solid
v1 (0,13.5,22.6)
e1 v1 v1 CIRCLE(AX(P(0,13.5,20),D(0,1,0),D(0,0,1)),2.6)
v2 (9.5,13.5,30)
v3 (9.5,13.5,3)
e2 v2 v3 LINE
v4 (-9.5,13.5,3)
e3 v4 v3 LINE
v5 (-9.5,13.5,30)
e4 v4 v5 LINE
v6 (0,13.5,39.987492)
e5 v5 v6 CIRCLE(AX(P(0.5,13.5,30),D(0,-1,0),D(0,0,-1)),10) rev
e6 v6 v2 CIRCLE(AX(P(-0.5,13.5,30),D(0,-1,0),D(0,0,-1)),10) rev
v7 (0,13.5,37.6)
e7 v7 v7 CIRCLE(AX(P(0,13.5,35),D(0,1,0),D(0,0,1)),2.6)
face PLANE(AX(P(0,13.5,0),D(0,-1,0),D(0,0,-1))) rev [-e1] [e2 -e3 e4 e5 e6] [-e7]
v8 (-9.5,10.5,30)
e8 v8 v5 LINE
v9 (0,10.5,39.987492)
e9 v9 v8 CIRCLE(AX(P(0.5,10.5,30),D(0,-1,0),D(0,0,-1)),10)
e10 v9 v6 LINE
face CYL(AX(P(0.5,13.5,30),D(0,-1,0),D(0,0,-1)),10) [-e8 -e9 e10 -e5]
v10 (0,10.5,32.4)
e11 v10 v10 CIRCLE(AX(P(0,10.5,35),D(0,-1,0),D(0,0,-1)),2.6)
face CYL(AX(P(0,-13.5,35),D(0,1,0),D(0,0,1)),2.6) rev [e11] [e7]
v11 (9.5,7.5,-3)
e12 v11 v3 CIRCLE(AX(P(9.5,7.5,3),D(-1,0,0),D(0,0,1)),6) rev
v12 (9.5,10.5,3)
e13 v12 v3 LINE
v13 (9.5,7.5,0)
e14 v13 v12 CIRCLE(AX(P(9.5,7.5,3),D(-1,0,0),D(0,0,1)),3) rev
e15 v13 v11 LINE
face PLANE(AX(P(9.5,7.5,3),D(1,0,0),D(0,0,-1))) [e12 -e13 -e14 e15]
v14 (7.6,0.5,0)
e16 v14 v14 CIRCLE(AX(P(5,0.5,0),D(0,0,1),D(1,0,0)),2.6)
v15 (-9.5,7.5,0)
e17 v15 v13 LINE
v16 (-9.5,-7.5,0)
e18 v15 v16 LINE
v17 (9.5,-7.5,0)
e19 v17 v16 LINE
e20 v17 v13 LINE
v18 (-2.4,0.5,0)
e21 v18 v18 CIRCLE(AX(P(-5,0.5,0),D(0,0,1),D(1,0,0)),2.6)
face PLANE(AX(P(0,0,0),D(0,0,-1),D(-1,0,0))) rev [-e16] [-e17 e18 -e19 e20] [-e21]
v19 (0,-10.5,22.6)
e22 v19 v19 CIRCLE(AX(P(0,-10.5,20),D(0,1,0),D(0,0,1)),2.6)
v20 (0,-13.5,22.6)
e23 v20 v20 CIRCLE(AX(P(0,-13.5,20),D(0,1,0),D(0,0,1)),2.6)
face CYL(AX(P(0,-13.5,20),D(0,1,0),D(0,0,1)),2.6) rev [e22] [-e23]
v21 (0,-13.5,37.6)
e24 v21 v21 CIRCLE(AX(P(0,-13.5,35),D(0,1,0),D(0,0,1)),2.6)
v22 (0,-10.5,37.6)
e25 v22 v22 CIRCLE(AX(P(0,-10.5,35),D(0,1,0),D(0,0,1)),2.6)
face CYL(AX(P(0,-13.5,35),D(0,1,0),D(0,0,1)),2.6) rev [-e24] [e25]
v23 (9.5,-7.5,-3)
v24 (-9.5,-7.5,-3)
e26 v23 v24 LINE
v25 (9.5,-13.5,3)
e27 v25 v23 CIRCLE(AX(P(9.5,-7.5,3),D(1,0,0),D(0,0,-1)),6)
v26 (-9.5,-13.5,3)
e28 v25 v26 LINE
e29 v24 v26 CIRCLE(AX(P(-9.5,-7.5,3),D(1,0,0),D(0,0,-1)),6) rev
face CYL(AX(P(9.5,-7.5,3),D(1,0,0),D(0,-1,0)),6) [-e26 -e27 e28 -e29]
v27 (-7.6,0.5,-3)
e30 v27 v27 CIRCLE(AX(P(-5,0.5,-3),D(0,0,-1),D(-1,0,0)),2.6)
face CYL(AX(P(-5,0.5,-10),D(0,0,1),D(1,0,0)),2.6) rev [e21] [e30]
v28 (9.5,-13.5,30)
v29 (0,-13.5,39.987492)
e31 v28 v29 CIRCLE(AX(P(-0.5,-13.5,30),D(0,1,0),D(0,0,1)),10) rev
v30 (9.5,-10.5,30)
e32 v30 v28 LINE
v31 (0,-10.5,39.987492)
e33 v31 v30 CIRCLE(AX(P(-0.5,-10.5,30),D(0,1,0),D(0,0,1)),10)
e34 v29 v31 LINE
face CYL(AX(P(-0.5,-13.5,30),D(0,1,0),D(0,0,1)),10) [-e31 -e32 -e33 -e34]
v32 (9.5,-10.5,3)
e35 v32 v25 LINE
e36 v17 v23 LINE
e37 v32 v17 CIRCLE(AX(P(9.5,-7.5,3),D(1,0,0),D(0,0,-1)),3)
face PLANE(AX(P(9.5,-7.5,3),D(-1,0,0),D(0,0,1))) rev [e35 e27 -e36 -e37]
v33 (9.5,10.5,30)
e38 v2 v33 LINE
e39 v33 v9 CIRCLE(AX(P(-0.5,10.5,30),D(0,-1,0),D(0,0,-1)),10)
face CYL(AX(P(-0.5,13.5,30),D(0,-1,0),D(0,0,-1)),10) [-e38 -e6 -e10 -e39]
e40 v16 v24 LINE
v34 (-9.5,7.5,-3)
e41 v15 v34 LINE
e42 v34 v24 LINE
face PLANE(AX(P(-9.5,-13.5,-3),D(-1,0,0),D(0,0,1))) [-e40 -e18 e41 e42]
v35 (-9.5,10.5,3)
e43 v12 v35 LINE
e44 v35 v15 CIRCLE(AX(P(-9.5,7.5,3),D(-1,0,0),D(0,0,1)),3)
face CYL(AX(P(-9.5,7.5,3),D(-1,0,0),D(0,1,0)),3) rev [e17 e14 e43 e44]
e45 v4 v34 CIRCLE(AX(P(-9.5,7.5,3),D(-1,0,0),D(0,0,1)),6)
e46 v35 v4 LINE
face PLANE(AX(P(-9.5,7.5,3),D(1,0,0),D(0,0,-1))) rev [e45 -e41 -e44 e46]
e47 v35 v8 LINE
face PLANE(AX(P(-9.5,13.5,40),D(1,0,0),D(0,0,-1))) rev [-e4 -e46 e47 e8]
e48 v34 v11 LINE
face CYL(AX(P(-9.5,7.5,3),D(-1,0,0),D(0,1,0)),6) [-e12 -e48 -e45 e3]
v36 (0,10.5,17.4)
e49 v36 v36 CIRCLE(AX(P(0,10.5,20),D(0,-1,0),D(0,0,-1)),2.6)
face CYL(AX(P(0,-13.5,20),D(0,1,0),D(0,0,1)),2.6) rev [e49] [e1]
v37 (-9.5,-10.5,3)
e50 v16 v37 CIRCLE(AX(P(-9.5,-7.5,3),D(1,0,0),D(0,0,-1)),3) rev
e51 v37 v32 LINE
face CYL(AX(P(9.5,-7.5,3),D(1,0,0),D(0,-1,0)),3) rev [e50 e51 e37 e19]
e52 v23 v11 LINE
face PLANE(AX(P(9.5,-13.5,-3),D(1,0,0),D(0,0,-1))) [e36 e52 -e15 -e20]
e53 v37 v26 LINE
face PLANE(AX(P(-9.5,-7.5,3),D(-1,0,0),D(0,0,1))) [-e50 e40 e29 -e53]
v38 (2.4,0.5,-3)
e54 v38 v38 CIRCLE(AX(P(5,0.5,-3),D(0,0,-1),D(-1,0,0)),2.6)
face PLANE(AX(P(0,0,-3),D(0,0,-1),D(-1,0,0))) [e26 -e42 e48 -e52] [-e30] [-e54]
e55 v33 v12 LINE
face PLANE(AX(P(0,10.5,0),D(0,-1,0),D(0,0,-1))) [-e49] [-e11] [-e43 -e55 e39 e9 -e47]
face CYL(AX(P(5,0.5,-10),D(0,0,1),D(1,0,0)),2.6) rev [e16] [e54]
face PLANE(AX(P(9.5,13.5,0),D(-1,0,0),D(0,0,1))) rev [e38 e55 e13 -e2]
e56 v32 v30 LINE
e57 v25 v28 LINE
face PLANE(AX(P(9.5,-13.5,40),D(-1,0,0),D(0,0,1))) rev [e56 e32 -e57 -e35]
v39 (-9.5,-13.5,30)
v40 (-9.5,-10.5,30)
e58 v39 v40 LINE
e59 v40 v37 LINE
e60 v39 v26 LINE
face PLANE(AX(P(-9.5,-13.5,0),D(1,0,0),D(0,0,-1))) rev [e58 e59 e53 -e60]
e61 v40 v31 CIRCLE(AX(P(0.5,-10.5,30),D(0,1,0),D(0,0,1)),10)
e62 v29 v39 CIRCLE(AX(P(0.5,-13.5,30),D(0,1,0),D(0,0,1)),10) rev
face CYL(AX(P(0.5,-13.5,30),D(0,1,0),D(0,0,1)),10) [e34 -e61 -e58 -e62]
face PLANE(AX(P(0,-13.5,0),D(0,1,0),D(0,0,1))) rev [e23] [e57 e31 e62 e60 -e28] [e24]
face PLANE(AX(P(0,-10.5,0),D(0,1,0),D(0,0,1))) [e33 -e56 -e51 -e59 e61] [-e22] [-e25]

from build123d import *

# Parameters (mm, degrees)
SKETCH1_W                      = 19
SKETCH1_H                      = 27
BASE_FLANGE1_DEPTH             = 3
EDGE_FLANGE1_STRIP_W           = 18
EDGE_FLANGE1_STRIP_H           = 3
EDGE_FLANGE1_STRIP_CUT_DEPTH   = 19
EDGE_FLANGE1_STRIP_2_W         = 18
EDGE_FLANGE1_STRIP_2_H         = 3
EDGE_FLANGE1_STRIP_CUT_2_DEPTH = 19
EDGE_FLANGE1_DEPTH             = 19
EDGE_FLANGE1_BEND_DEPTH        = 19
SKETCH12_R                     = 2.6
CUT_EXTRUDE1_DEPTH             = 10
SKETCH13_R                     = 2.6
CUT_EXTRUDE2_DEPTH             = 50.185871955
FILLET1_R                      = 10


# Sheet-metal steps are written as plain solids
with BuildPart() as part:
    # Sketch1 → Base-Flange1 (new body)
    with BuildSketch(Plane.XY):
        Rectangle(SKETCH1_W, SKETCH1_H)
    extrude(amount=-BASE_FLANGE1_DEPTH)

    # Edge-Flange1 strip (across the edge) → Edge-Flange1 strip cut (cut)
    with BuildSketch(Plane(origin=(9.5, 13.5, 0), x_dir=(0, -1, 0), z_dir=(-1, 0, 0))):
        with Locations((-3, -1.5)):
            Rectangle(EDGE_FLANGE1_STRIP_W, EDGE_FLANGE1_STRIP_H)
    extrude(amount=EDGE_FLANGE1_STRIP_CUT_DEPTH, mode=Mode.SUBTRACT)

    # Edge-Flange1 strip 2 (across the edge) → Edge-Flange1 strip cut 2 (cut)
    with BuildSketch(Plane(origin=(-9.5, -13.5, 0), x_dir=(0, 1, 0), z_dir=(1, 0, 0))):
        with Locations((-3, -1.5)):
            Rectangle(EDGE_FLANGE1_STRIP_2_W, EDGE_FLANGE1_STRIP_2_H)
    extrude(amount=EDGE_FLANGE1_STRIP_CUT_2_DEPTH, mode=Mode.SUBTRACT)

    # Edge-Flange1 section (across the edge) → Edge-Flange1 (add)
    with BuildSketch(Plane(origin=(9.5, 13.5, 0), x_dir=(0, -1, 0), z_dir=(-1, 0, 0))):
        with BuildLine():
            Line((0, 3), (0, 40))
            Line((0, 40), (3, 40))
            Line((3, 40), (3, 3))
            ThreePointArc((3, 3), (3.878679656, 0.878679656), (6, 0))
            Line((6, 0), (6, -3))
            ThreePointArc((6, -3), (1.757359313, -1.242640687), (0, 3))
        make_face()
    extrude(amount=EDGE_FLANGE1_DEPTH)

    # Edge-Flange1 section 2 (across the edge) → Edge-Flange1 bend (add)
    with BuildSketch(Plane(origin=(-9.5, -13.5, 0), x_dir=(0, 1, 0), z_dir=(1, 0, 0))):
        with BuildLine():
            Line((0, 3), (0, 40))
            Line((0, 40), (3, 40))
            Line((3, 40), (3, 3))
            ThreePointArc((3, 3), (3.878679656, 0.878679656), (6, 0))
            Line((6, 0), (6, -3))
            ThreePointArc((6, -3), (1.757359313, -1.242640687), (0, 3))
        make_face()
    extrude(amount=EDGE_FLANGE1_BEND_DEPTH)

    # Sketch12 → Cut-Extrude1 (cut)
    with BuildSketch(Plane.XY):
        with Locations((5, 0.5)):
            Circle(SKETCH12_R)
        with Locations((-5, 0.5)):
            Circle(SKETCH12_R)
    extrude(amount=-CUT_EXTRUDE1_DEPTH, mode=Mode.SUBTRACT)

    # Sketch13 → Cut-Extrude2 (cut, through all)
    with BuildSketch(Plane(origin=(0, 13.5, 0), x_dir=(1, 0, 0), z_dir=(0, 1, 0))):
        with Locations(Location((0, -35, 0), (0, 0, 270))):
            Circle(SKETCH13_R)
        with Locations(Location((0, -20, 0), (0, 0, 270))):
            Circle(SKETCH13_R)
    extrude(amount=-CUT_EXTRUDE2_DEPTH, mode=Mode.SUBTRACT)

    # Fillet1
    # the kernel refuses this fillet: 10 mm, written as the material it takes off along each edge
    with BuildSketch(Plane(origin=(-9.5, -38.5, 40), x_dir=(0, 0, -1), z_dir=(0, 1, 0)), Plane(origin=(9.5, -38.5, 40), x_dir=(-1, 0, 0), z_dir=(0, 1, 0))) as fillet1_piece_1:
        with BuildLine():
            CenterArc((FILLET1_R, -FILLET1_R), FILLET1_R, 90, 90)
            Line((0, -FILLET1_R), (0, 0))
            Line((0, 0), (FILLET1_R, 0))
        make_face()
    extrude(amount=53, mode=Mode.SUBTRACT)
    with BuildSketch(Plane(origin=(-9.5, 38.5, 40), x_dir=(0, 0, -1), z_dir=(0, -1, 0)), Plane(origin=(9.5, 38.5, 40), x_dir=(-1, 0, 0), z_dir=(0, -1, 0))) as fillet1_piece_2:
        with BuildLine():
            CenterArc((FILLET1_R, FILLET1_R), FILLET1_R, 180, 90)
            Line((0, FILLET1_R), (0, 0))
            Line((0, 0), (FILLET1_R, 0))
        make_face()
    extrude(amount=53, mode=Mode.SUBTRACT)


solid = part.part
